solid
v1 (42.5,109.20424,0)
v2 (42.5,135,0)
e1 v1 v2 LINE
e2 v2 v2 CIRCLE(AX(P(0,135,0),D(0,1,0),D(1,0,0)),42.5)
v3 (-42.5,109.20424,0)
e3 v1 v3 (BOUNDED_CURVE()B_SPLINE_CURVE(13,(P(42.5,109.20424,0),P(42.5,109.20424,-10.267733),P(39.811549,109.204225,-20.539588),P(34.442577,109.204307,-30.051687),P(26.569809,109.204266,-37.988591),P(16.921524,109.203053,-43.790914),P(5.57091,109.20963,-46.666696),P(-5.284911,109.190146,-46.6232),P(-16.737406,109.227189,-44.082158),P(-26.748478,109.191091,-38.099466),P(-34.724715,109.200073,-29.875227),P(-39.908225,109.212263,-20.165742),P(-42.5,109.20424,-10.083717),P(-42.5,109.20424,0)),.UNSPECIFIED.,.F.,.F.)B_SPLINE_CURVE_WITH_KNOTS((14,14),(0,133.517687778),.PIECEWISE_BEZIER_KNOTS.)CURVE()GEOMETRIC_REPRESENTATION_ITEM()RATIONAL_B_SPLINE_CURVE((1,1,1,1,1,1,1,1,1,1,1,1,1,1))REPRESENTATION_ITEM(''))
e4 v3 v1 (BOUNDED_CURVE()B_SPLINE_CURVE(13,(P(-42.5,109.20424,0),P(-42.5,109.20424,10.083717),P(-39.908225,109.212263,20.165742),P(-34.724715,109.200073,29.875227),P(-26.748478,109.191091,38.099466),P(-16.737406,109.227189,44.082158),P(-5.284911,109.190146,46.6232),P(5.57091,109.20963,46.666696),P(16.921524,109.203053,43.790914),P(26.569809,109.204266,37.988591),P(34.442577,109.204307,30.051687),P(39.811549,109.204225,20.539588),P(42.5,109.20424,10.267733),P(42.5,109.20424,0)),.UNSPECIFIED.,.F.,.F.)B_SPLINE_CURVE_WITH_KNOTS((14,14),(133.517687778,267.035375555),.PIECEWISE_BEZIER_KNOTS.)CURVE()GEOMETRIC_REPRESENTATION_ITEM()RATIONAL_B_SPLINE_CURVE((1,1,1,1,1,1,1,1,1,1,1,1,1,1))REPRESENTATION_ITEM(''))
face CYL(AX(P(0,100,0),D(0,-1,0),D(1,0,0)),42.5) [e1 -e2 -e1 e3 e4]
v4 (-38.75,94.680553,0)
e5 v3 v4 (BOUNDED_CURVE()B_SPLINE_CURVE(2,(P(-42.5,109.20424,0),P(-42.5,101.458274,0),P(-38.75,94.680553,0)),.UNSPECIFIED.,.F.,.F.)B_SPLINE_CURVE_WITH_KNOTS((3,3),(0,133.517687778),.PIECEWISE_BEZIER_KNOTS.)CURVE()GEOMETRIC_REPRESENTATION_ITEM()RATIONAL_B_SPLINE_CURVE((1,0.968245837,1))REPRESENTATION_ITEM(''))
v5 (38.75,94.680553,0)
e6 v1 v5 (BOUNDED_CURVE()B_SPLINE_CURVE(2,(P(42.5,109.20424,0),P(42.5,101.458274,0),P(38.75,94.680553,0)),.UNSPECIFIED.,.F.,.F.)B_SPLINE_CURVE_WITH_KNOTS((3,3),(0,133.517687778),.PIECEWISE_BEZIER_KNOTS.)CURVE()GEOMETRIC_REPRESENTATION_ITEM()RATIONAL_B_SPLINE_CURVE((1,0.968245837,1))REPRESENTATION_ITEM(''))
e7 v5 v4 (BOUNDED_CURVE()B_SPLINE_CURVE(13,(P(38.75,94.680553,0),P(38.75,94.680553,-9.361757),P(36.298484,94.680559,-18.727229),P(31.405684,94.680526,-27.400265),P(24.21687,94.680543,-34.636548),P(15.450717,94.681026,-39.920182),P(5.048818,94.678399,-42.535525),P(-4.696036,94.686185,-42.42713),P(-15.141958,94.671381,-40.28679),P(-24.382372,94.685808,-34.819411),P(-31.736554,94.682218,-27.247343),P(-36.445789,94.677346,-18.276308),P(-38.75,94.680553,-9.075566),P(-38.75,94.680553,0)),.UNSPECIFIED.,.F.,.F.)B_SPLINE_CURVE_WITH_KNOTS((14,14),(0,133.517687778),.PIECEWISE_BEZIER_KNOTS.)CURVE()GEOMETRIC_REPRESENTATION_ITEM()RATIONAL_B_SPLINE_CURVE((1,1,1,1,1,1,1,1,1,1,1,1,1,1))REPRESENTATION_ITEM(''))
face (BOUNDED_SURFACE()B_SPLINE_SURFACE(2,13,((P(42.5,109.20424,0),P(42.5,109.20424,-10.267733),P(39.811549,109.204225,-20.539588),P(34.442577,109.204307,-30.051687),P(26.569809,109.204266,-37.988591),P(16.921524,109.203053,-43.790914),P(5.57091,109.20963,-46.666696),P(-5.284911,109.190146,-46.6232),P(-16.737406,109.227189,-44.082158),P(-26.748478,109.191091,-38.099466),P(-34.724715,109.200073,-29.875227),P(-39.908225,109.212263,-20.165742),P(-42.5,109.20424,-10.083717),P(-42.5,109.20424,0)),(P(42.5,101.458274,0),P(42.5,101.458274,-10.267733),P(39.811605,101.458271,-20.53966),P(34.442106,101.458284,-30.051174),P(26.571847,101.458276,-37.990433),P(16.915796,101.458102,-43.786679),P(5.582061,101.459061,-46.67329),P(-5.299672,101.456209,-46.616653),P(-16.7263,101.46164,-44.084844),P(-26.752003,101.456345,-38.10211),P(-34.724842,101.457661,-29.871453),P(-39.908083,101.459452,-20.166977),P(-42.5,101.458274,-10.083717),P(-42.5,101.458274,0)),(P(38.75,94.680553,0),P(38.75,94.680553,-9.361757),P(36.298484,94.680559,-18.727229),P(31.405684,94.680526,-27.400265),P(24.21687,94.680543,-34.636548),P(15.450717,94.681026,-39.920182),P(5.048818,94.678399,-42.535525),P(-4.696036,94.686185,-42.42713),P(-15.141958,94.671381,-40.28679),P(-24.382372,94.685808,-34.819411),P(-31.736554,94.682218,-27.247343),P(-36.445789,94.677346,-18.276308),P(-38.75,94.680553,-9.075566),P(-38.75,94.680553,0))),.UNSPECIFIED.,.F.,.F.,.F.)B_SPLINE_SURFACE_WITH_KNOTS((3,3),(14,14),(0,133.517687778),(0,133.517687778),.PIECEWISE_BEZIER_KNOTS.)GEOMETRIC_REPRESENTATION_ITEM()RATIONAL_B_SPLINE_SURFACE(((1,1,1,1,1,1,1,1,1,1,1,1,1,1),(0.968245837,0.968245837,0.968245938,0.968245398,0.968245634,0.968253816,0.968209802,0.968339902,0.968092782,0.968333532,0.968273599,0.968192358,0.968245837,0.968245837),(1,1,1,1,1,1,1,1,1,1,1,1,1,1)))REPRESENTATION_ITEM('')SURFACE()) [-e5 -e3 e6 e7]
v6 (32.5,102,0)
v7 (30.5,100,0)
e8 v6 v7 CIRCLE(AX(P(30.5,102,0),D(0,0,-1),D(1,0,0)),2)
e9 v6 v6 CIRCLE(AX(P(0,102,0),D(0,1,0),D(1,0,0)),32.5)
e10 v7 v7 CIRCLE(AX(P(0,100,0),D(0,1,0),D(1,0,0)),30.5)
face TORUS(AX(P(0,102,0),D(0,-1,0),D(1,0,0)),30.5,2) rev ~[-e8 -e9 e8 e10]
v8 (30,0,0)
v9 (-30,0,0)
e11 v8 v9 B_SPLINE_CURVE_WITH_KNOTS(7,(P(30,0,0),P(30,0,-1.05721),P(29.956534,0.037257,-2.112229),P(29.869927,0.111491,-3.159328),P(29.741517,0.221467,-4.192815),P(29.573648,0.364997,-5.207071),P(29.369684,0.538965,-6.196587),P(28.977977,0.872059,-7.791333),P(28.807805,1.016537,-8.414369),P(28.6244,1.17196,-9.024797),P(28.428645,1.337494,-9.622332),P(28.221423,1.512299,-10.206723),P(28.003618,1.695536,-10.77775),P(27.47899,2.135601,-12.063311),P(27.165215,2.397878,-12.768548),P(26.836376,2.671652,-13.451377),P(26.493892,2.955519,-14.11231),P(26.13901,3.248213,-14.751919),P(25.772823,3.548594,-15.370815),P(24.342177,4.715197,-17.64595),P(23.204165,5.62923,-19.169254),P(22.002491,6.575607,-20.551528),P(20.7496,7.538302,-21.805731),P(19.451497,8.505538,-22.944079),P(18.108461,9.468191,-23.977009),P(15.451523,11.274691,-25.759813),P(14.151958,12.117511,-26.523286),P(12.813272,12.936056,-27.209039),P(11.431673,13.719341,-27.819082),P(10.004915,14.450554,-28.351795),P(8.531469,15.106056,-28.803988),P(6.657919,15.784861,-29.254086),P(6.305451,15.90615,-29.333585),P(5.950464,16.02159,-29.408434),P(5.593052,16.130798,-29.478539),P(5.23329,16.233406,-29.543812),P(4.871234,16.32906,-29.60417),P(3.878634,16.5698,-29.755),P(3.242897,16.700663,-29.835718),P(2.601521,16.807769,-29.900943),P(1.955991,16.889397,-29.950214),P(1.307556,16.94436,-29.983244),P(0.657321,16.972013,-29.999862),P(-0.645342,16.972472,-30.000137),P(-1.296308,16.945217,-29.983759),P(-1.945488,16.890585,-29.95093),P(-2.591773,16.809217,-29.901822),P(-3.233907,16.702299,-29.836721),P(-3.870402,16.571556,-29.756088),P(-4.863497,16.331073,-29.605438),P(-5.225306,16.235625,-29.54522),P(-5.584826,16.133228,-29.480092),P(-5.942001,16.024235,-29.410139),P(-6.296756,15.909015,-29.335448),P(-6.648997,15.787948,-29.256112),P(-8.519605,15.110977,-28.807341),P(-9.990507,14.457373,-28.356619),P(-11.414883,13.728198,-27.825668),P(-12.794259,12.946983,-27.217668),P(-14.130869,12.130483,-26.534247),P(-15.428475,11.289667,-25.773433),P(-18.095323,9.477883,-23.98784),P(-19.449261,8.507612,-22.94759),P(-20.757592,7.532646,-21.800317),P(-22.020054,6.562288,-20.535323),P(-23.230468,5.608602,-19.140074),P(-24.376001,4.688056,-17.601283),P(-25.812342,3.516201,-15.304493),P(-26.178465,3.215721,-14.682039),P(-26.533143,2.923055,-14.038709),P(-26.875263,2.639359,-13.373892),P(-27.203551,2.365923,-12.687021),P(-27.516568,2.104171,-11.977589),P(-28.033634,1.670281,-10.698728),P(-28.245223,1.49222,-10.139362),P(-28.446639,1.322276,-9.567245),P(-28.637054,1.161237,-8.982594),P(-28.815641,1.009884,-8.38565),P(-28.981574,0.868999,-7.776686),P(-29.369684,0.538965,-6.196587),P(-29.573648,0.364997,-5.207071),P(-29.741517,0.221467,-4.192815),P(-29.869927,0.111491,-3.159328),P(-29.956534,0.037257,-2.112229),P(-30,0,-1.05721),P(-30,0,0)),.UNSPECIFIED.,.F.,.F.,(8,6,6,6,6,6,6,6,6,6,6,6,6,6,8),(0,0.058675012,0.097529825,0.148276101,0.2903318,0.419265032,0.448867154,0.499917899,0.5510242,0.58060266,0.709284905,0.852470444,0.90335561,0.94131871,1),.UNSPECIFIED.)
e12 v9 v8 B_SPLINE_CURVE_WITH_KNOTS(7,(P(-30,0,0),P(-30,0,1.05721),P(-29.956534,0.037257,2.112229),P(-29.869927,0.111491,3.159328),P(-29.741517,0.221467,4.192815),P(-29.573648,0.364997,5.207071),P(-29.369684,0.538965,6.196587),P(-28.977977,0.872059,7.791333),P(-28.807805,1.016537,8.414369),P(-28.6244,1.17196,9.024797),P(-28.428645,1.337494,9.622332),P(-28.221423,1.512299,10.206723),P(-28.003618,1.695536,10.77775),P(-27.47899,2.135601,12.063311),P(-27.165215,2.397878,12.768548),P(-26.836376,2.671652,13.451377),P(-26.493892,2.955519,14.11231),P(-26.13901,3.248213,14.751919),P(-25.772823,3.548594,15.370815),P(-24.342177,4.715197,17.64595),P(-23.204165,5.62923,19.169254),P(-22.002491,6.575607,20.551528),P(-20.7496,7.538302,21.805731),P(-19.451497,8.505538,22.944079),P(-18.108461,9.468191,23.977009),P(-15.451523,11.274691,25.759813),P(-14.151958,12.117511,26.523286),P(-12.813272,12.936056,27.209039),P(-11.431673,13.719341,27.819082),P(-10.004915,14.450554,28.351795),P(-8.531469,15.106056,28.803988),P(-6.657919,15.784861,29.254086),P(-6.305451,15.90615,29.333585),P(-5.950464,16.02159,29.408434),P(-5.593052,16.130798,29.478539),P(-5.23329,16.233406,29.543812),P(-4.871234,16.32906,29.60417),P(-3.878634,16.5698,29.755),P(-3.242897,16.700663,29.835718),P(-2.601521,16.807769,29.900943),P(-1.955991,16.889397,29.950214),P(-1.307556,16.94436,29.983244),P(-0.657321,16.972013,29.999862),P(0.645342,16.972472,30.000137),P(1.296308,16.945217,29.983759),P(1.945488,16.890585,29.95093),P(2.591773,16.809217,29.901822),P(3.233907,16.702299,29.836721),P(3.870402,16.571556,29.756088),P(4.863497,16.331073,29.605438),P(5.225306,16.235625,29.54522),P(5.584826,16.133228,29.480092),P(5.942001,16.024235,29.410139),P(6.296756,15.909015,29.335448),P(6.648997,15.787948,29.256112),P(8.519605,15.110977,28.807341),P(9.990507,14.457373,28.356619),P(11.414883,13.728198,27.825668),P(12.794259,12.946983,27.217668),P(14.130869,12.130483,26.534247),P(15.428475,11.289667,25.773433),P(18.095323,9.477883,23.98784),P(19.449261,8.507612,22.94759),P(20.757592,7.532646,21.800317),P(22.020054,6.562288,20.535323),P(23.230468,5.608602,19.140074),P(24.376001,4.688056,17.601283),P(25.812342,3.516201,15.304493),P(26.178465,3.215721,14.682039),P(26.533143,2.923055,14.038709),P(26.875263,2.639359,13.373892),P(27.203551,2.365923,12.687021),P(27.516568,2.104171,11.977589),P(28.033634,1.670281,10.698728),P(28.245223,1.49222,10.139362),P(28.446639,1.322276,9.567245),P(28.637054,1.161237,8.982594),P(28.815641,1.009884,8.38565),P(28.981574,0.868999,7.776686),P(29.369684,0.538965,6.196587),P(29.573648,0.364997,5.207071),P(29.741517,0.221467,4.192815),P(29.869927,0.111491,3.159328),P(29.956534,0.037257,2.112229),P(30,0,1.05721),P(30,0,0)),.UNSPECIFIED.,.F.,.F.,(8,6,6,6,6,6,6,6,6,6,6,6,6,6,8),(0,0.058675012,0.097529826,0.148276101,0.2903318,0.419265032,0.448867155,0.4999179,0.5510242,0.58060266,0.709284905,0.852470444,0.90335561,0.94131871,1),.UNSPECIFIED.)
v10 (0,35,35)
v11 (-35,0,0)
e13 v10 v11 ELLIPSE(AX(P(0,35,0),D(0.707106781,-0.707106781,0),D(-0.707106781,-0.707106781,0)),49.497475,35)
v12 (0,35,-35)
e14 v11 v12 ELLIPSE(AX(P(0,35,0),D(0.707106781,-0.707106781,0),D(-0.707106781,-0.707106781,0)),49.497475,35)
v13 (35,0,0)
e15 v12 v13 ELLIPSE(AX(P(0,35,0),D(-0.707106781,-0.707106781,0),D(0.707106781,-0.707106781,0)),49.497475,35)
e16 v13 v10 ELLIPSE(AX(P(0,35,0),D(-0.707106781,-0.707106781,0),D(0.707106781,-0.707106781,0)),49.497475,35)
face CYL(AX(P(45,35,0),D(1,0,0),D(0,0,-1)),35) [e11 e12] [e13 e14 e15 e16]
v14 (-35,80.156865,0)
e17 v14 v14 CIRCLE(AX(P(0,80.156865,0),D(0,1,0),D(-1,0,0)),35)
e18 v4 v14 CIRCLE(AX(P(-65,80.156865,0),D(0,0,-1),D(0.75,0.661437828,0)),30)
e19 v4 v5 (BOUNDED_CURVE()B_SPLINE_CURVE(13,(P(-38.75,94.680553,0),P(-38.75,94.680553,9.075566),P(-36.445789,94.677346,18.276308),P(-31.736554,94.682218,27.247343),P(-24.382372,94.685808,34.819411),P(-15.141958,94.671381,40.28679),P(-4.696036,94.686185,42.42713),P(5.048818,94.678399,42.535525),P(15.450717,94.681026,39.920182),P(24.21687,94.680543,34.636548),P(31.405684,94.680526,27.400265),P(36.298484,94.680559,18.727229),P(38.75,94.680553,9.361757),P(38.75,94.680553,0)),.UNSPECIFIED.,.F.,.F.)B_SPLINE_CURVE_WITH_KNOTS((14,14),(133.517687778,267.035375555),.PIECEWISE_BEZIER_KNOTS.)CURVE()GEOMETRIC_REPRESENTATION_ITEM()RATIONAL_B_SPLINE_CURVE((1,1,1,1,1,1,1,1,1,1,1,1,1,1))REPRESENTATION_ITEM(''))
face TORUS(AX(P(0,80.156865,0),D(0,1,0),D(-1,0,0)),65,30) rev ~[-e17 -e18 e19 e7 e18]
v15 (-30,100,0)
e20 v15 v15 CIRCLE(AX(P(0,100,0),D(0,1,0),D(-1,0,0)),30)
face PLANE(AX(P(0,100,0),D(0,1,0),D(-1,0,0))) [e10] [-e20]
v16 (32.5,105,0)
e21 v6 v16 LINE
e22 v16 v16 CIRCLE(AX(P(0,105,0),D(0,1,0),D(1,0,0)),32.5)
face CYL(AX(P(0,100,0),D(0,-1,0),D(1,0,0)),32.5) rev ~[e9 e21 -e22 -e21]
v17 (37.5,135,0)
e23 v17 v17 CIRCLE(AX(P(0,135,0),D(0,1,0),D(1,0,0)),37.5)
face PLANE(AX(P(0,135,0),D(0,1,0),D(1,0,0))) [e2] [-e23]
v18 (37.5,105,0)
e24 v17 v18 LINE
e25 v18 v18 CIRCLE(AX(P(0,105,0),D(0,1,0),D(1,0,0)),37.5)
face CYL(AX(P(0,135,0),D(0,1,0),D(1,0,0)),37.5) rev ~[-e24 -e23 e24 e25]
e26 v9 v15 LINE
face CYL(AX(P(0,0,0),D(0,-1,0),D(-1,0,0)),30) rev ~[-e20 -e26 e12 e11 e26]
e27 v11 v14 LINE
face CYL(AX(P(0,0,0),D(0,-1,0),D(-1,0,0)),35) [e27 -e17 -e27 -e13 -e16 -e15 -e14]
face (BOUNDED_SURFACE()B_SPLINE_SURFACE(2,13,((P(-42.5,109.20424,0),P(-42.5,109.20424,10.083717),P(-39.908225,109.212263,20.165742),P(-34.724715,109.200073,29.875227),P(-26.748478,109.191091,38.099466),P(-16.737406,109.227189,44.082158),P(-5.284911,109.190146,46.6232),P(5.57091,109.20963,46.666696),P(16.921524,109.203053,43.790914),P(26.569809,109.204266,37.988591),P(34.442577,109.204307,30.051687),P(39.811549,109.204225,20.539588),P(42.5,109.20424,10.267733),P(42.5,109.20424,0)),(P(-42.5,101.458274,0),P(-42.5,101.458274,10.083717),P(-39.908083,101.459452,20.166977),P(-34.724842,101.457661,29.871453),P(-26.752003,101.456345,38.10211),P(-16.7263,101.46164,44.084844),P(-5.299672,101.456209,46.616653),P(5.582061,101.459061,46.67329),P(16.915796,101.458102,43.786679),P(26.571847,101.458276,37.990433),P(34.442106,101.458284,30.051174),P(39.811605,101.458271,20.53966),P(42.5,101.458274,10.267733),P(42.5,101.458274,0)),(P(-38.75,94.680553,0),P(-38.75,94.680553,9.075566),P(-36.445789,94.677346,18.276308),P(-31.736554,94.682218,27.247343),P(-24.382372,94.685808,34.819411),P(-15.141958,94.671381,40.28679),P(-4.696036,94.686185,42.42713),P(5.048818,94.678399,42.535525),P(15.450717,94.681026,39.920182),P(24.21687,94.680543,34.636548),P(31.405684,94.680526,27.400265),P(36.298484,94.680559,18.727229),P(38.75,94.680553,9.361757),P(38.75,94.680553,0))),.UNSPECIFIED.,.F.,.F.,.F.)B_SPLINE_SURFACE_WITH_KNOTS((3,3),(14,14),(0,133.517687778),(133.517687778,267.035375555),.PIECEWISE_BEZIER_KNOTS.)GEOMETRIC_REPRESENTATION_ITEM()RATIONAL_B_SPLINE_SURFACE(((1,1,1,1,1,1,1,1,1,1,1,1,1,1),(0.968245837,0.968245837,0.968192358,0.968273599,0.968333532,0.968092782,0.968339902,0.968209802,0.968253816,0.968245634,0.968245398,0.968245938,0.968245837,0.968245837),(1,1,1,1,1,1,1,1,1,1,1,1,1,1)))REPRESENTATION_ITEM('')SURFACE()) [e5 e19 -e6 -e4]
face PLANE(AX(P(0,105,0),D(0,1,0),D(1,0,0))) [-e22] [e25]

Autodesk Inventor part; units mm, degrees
ref_plane "YZ Plane" through (0, 0, 0) normal (1, 0, 0) x (0, 1, 0)
ref_plane "XZ Plane" through (0, 0, 0) normal (0, 1, 0) x (-1, 0, 0)
ref_plane "XY Plane" through (0, 0, 0) normal (0, 0, 1) x (1, 0, 0)
sketch "Boceto1" plane through (0, 0, 0) normal (0, 1, 0) x (-1, 0, 0)
  circle A0 centre (0, 0) radius 30
  circle A1 centre (0, 0) radius 35
  dimension "d0" = 60
  dimension "d1" = 70
extrude "Extrusión1" add sketch "Boceto1" along normal blind 100
sketch "Boceto2" plane through (0, 0, 0) normal (0, -1, 0) x (1, 0, 0)
  line L0 (0, 0) -> (0, 45)
  line L1 (45, 35) -> (45, -35)
  line L2 (40, 35) -> (40, -35)
  line L3 (45, 0) -> (45, -35)
  line L4 (45, -35) -> (40, -35)
  line L5 (45, 0) -> (45, 35)
  line L6 (45, 35) -> (40, 35)
extrude "Extrusión2" add sketch "Boceto2" against normal blind 35
sketch "Boceto3" plane through (45, 0, 35) normal (1, 0, 0) x (0, 0, -1)
  line L0 (35, 0) -> (35, 35)
  circle A0 centre (35, 35) radius 35
  line L1 (0, 0) -> (0, 35) projected
  line L2 (0, 35) -> (0, 0)
  line L3 (70, 0) -> (0, 0) projected
  line L4 (0, 0) -> (70, 0)
  line L5 (70, 0) -> (70, 35) projected
  line L6 (70, 0) -> (70, 35)
  point P0 (70, 35)
extrude "Extrusión3" cut sketch "Boceto3" against normal blind 100 contours L5 L3 A0 | A0 L3 L1
sketch "Boceto4" plane through (45, 35, 0) normal (1, 0, 0) x (0, 0, -1)
  line L0 (-35, 0) -> (35, 0) projected
  line L1 (-35, 0) -> (35, 0)
  point P0 (0, -35)
sketch "Boceto5" plane through (0, 35, 0) normal (0, 1, 0) x (1, 0, 0)
  line L0 (40, 35) -> (40, -35) projected
  line L1 (40, -35) -> (45, -35) projected
  line L2 (40, -35) -> (45, -35)
  line L3 (45, -35) -> (45, 35) projected
  line L4 (45, -35) -> (45, 35)
  line L5 (45, 35) -> (40, 35) projected
  line L6 (45, 35) -> (40, 35)
  line L7 (40, 35) -> (40, -35)
  point P0 (0, 0)
extrude "Extrusión4" cut sketch "Boceto5" against normal blind 35
sketch "Boceto6" plane through (0, 100, 0) normal (0, 1, 0) x (1, 0, 0)
  circle A0 centre (0, 0) radius 42.5
  circle A1 centre (0, 0) radius 32.5
  dimension "d19" = 85
  dimension "d20" = 65
extrude "Extrusión5" add sketch "Boceto6" along normal blind 35
fillet "Empalme1" radius 30 1 edges at (35, 100, 0)
fillet "Empalme2" radius 2 1 edges at (-32.5, 100, 0)
fillet "Empalme3" radius 30 2 edges at (0, 100, -42.5) (0, 100, 42.5)
sketch "Boceto7" plane through (0, 135, 0) normal (0, 1, 0) x (1, 0, 0)
  circle A0 centre (0, 0) radius 32.5
  circle A1 centre (0, 0) radius 37.5
  dimension "d26" = 75
extrude "Extrusión6" cut sketch "Boceto7" against normal blind 30
properties part number "Modelo1_tronco_Pepu"
